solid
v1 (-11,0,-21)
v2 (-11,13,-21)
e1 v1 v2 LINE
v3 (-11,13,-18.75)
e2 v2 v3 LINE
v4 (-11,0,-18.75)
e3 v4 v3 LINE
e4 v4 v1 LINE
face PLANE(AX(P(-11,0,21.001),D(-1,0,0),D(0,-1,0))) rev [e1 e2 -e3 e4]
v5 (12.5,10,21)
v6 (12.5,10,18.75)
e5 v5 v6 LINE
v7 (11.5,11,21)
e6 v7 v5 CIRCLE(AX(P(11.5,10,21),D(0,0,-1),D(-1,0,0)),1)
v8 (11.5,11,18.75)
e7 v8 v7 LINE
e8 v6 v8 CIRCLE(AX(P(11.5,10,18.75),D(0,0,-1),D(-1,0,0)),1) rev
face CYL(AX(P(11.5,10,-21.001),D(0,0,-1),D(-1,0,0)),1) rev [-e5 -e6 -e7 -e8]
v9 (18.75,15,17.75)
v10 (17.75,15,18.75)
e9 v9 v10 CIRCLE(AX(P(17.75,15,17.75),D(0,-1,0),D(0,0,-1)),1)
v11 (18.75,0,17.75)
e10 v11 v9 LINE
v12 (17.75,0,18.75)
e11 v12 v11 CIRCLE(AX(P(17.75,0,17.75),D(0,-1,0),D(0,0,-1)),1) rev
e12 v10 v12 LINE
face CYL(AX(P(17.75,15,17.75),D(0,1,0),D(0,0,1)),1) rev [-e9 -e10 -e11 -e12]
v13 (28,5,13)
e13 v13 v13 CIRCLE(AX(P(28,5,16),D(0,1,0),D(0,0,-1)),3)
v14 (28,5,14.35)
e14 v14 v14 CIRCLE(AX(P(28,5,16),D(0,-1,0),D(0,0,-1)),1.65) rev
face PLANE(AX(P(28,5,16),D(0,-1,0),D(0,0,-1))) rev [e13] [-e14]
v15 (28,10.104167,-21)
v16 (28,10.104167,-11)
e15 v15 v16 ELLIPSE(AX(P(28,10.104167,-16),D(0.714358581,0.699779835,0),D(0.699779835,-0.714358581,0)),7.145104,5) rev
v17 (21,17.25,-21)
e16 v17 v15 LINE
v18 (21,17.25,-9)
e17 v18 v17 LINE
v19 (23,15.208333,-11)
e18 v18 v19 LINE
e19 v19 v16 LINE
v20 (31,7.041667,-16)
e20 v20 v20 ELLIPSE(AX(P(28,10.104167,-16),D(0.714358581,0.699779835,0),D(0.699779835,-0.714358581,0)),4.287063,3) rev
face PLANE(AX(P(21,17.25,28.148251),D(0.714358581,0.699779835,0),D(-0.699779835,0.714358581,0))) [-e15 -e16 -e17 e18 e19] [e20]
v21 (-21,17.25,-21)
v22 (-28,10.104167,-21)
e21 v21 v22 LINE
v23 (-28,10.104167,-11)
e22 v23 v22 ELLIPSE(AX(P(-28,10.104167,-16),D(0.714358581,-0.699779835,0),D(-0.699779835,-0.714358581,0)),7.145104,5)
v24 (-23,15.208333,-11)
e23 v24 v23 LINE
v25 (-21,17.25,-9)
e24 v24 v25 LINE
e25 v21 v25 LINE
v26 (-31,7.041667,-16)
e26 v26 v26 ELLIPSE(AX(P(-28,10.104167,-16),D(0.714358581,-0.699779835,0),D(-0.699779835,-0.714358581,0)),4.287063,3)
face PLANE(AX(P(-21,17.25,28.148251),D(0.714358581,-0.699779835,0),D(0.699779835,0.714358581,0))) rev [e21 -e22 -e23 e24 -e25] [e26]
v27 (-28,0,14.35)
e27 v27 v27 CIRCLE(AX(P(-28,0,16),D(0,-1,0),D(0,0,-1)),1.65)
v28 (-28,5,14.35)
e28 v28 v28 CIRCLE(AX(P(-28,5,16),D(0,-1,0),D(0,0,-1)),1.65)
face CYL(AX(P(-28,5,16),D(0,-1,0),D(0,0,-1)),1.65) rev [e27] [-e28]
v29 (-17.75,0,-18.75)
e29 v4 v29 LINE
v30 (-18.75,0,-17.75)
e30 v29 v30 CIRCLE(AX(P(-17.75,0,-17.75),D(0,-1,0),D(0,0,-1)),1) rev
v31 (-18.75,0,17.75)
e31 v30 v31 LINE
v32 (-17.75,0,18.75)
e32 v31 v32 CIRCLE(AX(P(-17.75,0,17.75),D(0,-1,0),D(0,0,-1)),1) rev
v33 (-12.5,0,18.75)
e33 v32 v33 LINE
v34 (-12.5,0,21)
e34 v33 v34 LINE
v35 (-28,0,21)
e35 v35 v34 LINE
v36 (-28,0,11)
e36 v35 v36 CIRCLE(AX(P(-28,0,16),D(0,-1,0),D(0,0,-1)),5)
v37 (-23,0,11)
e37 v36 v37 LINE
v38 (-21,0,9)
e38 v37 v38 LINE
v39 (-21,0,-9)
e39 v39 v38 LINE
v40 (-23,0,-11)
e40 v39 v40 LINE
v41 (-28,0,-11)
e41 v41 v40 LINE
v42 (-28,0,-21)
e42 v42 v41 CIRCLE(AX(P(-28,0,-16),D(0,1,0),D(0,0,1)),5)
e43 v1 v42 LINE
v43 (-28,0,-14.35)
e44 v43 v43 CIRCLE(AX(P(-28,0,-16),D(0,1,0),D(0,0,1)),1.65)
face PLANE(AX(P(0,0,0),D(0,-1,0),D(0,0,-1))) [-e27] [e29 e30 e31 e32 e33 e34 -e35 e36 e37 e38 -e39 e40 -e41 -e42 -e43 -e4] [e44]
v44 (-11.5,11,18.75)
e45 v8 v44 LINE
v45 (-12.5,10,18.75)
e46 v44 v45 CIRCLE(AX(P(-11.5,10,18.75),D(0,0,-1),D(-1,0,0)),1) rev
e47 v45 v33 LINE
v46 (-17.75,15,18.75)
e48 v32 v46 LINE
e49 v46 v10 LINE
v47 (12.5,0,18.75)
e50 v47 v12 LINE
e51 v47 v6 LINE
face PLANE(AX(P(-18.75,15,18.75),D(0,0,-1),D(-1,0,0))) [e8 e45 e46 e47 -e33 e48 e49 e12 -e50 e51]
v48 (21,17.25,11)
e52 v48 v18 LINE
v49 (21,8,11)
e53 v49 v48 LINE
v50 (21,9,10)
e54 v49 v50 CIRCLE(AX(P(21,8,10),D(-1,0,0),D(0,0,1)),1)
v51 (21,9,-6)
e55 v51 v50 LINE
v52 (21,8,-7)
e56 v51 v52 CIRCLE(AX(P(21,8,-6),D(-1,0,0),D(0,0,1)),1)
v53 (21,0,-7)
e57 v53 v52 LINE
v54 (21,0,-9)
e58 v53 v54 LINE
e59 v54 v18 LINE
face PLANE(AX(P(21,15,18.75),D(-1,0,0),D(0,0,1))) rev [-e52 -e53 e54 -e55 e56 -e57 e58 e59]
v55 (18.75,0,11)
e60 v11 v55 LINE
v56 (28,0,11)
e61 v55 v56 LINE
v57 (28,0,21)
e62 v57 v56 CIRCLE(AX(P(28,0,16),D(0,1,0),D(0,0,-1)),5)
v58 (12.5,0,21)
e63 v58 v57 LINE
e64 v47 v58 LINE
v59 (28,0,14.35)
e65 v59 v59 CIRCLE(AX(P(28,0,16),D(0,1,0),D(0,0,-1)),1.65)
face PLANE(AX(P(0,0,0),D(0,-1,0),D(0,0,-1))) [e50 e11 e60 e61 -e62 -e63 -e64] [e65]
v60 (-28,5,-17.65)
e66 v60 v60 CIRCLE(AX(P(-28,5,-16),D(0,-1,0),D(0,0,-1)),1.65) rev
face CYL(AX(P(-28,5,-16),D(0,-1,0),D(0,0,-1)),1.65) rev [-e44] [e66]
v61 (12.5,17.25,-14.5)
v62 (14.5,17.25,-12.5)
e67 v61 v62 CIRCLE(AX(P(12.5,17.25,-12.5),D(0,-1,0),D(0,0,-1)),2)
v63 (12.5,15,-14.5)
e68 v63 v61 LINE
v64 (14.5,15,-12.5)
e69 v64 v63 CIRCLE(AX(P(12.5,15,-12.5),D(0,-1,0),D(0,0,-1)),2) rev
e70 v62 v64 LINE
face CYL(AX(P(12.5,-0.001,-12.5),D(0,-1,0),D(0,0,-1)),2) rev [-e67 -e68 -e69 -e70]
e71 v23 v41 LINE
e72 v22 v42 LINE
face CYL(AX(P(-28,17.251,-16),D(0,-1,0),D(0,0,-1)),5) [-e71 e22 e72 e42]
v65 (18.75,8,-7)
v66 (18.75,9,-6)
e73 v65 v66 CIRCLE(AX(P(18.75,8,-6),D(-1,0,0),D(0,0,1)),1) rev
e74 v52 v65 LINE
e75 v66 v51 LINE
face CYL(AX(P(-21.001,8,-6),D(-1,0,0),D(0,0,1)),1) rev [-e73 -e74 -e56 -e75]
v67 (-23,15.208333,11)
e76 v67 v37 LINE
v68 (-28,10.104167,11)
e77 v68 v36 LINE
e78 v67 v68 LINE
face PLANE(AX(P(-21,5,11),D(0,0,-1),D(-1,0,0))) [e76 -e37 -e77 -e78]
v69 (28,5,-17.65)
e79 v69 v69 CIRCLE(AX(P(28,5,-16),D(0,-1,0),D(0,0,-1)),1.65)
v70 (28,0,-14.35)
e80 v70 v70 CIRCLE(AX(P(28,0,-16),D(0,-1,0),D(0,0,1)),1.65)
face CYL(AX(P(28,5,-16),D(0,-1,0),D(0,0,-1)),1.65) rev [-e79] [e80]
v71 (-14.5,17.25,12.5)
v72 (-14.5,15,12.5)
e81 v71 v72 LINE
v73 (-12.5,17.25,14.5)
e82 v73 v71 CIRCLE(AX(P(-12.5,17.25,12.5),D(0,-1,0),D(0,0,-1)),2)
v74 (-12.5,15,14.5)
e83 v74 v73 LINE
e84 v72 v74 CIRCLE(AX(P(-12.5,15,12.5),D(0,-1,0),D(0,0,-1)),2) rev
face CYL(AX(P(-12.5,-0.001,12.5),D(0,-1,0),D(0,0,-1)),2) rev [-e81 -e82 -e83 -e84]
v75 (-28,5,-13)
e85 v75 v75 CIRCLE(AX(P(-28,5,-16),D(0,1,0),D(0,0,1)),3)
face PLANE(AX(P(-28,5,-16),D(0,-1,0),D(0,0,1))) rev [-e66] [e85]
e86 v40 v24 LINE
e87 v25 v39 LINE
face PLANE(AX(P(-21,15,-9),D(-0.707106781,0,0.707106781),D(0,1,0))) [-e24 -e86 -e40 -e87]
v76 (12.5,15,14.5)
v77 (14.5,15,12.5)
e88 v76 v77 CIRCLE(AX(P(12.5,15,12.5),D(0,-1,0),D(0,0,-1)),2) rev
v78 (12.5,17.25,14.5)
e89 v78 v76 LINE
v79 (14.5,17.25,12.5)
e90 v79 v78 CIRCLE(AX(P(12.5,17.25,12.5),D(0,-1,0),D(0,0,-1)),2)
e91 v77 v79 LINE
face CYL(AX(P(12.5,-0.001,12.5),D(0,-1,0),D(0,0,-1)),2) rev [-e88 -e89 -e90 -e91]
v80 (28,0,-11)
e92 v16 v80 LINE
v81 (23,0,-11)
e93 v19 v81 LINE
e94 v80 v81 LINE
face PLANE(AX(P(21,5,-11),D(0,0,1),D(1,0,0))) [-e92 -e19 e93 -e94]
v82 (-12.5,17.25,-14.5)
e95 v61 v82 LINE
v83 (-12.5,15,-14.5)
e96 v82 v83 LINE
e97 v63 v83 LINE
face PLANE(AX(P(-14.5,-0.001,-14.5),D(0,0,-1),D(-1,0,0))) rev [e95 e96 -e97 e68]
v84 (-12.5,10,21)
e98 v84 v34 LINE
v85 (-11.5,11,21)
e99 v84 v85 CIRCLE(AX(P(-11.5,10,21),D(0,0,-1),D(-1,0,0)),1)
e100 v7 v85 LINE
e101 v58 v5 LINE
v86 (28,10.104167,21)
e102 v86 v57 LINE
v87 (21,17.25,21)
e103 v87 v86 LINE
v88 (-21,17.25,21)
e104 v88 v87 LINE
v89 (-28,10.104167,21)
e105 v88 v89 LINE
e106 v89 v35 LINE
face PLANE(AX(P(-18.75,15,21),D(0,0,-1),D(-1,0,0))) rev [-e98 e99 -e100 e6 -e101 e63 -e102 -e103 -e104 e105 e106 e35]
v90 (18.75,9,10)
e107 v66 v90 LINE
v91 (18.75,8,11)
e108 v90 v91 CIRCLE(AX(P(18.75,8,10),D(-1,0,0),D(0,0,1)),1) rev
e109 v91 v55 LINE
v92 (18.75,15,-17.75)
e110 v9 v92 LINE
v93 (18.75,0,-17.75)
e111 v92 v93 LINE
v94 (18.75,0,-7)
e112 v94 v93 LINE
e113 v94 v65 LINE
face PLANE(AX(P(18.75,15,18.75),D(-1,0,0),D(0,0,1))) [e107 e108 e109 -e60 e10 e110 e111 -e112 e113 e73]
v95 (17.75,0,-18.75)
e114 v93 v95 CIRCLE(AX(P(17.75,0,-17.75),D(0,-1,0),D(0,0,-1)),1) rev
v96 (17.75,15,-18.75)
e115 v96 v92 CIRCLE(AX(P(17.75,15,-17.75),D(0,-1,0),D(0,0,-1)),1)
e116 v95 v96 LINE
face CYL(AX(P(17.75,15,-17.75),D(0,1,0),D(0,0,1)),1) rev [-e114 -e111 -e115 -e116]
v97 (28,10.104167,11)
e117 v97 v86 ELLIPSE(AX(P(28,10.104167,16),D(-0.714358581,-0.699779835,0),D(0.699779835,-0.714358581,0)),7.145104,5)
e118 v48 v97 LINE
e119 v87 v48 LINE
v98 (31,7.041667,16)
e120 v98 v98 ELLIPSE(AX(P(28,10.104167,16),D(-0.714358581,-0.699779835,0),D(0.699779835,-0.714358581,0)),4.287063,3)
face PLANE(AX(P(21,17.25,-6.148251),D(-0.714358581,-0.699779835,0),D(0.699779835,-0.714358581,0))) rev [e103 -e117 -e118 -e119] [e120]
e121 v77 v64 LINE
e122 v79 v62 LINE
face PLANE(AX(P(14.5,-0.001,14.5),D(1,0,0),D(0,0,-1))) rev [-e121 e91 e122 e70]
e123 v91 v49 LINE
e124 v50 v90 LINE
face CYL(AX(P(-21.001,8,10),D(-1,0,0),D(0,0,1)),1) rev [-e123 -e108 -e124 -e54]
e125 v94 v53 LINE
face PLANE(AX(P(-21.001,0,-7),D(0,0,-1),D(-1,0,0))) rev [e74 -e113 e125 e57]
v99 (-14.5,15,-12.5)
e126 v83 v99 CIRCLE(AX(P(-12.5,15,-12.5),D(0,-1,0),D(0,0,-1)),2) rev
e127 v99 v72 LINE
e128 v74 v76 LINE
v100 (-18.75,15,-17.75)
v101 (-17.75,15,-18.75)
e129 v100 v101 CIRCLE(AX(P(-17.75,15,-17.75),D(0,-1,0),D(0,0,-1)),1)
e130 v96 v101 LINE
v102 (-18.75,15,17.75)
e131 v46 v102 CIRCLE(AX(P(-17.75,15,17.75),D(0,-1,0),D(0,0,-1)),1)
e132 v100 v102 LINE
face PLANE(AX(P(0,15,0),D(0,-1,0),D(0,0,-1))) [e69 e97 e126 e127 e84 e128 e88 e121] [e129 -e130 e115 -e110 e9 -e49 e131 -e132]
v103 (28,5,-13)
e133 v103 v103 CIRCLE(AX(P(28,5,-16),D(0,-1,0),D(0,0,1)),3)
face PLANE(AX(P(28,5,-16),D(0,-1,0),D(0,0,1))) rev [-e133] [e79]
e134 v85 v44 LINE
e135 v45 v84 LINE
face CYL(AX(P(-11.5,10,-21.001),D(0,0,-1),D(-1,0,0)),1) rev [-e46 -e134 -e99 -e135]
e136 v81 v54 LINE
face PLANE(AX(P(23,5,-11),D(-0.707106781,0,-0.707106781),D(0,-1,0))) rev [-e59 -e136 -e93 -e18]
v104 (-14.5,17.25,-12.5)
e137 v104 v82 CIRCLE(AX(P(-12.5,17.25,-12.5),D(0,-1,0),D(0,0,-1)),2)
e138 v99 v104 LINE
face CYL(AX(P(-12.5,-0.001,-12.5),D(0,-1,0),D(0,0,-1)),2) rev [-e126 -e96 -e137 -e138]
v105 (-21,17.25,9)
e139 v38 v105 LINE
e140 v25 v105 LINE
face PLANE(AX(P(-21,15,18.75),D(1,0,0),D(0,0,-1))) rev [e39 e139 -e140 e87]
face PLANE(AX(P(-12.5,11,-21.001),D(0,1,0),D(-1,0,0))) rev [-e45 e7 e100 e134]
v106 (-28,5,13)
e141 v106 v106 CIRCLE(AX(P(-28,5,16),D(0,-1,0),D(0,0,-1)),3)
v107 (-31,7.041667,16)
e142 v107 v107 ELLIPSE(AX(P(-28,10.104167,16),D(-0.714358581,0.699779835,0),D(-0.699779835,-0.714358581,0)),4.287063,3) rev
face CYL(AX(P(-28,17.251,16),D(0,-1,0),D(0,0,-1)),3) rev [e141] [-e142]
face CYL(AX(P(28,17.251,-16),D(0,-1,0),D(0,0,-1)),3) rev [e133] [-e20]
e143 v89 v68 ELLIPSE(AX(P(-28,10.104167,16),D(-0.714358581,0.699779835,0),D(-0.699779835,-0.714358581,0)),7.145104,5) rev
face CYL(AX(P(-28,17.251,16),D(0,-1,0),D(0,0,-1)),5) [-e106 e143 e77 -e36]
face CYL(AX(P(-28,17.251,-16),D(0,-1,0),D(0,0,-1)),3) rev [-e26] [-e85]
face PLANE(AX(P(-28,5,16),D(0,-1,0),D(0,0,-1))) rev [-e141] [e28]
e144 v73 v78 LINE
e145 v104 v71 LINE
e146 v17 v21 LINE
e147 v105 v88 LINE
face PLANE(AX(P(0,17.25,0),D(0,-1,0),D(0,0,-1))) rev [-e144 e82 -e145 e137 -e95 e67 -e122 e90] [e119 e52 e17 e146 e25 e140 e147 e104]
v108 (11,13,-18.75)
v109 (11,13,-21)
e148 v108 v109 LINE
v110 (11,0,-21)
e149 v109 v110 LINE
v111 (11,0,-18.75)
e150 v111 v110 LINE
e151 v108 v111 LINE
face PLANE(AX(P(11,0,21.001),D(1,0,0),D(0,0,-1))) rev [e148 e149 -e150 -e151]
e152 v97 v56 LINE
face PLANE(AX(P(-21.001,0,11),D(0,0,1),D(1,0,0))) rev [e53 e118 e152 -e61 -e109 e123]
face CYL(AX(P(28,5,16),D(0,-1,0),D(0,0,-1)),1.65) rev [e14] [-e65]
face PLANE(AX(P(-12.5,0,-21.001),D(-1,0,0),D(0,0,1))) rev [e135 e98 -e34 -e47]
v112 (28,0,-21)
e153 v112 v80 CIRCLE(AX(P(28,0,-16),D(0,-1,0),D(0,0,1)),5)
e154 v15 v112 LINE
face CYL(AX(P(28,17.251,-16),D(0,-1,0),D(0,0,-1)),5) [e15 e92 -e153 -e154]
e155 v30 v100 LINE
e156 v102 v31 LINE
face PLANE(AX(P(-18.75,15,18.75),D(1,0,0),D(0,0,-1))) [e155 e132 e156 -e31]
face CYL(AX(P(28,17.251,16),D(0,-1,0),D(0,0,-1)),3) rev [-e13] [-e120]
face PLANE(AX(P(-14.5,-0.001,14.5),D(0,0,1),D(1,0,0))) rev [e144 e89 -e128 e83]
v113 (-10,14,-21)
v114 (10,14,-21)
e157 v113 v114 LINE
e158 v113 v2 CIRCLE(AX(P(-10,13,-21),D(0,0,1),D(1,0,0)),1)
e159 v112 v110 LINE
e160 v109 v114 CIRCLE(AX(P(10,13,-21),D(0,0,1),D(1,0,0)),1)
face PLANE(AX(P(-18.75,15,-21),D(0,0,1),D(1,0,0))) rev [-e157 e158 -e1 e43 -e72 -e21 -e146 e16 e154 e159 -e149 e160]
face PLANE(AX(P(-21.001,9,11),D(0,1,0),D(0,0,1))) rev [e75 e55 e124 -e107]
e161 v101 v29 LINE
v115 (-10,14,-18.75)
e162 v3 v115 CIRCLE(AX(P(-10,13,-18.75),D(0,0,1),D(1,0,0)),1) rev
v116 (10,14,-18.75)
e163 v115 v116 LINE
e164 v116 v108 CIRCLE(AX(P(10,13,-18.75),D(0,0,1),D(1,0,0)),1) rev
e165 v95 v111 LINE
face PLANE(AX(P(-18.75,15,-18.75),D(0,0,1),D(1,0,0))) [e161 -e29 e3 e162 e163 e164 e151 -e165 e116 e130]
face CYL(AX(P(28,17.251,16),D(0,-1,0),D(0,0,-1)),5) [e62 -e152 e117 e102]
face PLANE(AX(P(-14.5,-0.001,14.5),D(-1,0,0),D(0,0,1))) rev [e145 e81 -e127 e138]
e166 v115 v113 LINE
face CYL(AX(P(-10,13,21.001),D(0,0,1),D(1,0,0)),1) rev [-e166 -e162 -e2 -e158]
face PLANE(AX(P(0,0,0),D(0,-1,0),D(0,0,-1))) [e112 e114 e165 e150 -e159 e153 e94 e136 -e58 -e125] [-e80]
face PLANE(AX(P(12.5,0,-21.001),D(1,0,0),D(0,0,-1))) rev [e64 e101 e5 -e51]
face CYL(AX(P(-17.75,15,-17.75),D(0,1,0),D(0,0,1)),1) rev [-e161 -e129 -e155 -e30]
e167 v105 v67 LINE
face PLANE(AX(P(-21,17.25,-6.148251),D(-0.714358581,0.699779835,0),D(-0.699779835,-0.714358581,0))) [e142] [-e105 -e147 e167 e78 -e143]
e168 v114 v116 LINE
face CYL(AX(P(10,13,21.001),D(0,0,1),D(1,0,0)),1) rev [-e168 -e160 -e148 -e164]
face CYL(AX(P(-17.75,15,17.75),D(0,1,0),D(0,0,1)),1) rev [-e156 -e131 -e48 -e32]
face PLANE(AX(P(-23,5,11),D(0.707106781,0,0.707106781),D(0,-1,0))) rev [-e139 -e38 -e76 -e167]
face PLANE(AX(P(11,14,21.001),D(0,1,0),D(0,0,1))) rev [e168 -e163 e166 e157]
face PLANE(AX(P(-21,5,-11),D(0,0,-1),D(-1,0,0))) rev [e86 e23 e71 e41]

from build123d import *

# Parameters (mm, degrees)
SKETCH1_W           = 37.5
SKETCH1_H           = 37.5
BOSS_EXTRUDE1_DEPTH = 15
SHELL1_T            = 2.25
CUT_EXTRUDE1_REACH  = 52.026
SKETCH2_W           = 25
SKETCH2_H           = 11
CUT_EXTRUDE2_REACH  = 52.026
SKETCH3_W           = 18
SKETCH3_H           = 9
CUT_EXTRUDE3_REACH  = 36.345
SKETCH5_W           = 29
SKETCH5_H           = 29
FILLET1_R           = 2
CUT_EXTRUDE4_REACH  = 52.026
SKETCH6_W           = 22
SKETCH6_H           = 14
FILLET2_R           = 1
SKETCH9_W           = 12
SKETCH9_H           = 10
BOSS_EXTRUDE3_DEPTH = 5
BOSS_EXTRUDE4_DEPTH = 10
SKETCH11_R          = 1.65
CUT_EXTRUDE5_DEPTH  = 5
CUT_EXTRUDE6_REACH  = 42.989
SKETCH12_R          = 3
CUT_EXTRUDE7_REACH  = 44.75
MIRROR3_OUTLINE_R   = 1.65
MIRROR3_DEPTH       = 5
MIRROR3_START       = 5
MIRROR3_2_OUTLINE_R = 3
MIRROR3_2_DEPTH     = 12.25
MIRROR3_START_2     = 27.072732359
MIRROR3_3_OUTLINE_W = 20
MIRROR3_3_OUTLINE_H = 11
MIRROR3_3_DEPTH     = 9.927267641
CHAMFER1_SIZE       = 2
FILLET3_R           = 1


with BuildPart() as part:
    # Sketch1 → Boss-Extrude1 (new body)
    with BuildSketch(Plane(origin=(0, 0, 0), x_dir=(1, 0, 0), z_dir=(0, 1, 0))):
        Rectangle(SKETCH1_W, SKETCH1_H)
    extrude(amount=BOSS_EXTRUDE1_DEPTH)

    # Shell1
    shell1_openings = [part.faces().sort_by_distance(p)[0] for p in [
        (0, 0, 0),
    ]]
    offset(amount=SHELL1_T, openings=shell1_openings, kind=Kind.INTERSECTION)

    # Sketch2 → Cut-Extrude1 (cut, up to next)
    with BuildSketch(Plane.XY.offset(21), mode=Mode.PRIVATE) as cut_extrude1_sk1:
        with Locations((0, 5.5)):
            Rectangle(SKETCH2_W, SKETCH2_H)
    cut_extrude1_tool1 = extrude(cut_extrude1_sk1.sketch, amount=-CUT_EXTRUDE1_REACH, mode=Mode.PRIVATE) & part.part
    add(cut_extrude1_tool1.solids().sort_by_distance((0, 5.5, 21))[0], mode=Mode.SUBTRACT)

    # Sketch3 → Cut-Extrude2 (cut, up to next)
    with BuildSketch(Plane(origin=(21, 0, 0), x_dir=(0, 0, -1), z_dir=(1, 0, 0)), mode=Mode.PRIVATE) as cut_extrude2_sk1:
        with Locations((-2, 4.5)):
            Rectangle(SKETCH3_W, SKETCH3_H)
    cut_extrude2_tool1 = extrude(cut_extrude2_sk1.sketch, amount=-CUT_EXTRUDE2_REACH, mode=Mode.PRIVATE) & part.part
    add(cut_extrude2_tool1.solids().sort_by_distance((21, 4.5, 2))[0], mode=Mode.SUBTRACT)

    # Sketch5 → Cut-Extrude3 (cut, up to next)
    with BuildSketch(Plane(origin=(0, 17.25, 0), x_dir=(1, 0, 0), z_dir=(0, 1, 0)), mode=Mode.PRIVATE) as cut_extrude3_sk1:
        Rectangle(SKETCH5_W, SKETCH5_H)
    cut_extrude3_tool1 = extrude(cut_extrude3_sk1.sketch, amount=-CUT_EXTRUDE3_REACH, mode=Mode.PRIVATE) & part.part
    add(cut_extrude3_tool1.solids().sort_by_distance((0, 17.25, 0))[0], mode=Mode.SUBTRACT)

    # Fillet1
    fillet1_edges = [part.edges().sort_by_distance(p)[0] for p in [
        (14.5, 16.125, -14.5),
        (14.5, 16.125, 14.5),
        (-14.5, 16.125, 14.5),
        (-14.5, 16.125, -14.5),
    ]]
    fillet(fillet1_edges, radius=FILLET1_R)

    # Sketch6 → Cut-Extrude4 (cut, up to next)
    with BuildSketch(Plane(origin=(0, 0, -21), x_dir=(-1, 0, 0), z_dir=(0, 0, -1)), mode=Mode.PRIVATE) as cut_extrude4_sk1:
        with Locations((0, 7)):
            Rectangle(SKETCH6_W, SKETCH6_H)
    cut_extrude4_tool1 = extrude(cut_extrude4_sk1.sketch, amount=-CUT_EXTRUDE4_REACH, mode=Mode.PRIVATE) & part.part
    add(cut_extrude4_tool1.solids().sort_by_distance((0, 7, -21))[0], mode=Mode.SUBTRACT)

    # Fillet2
    fillet2_edges = [part.edges().sort_by_distance(p)[0] for p in [
        (-11, 14, -19.875),
        (11, 14, -19.875),
        (12.5, 11, 19.875),
        (-12.5, 11, 19.875),
        (19.875, 9, 11),
        (19.875, 9, -7),
    ]]
    fillet(fillet2_edges, radius=FILLET2_R)

    # Sketch9 → Boss-Extrude3 (add)
    with BuildSketch(Plane.XZ):
        with Locations((-27, 16)):
            Rectangle(SKETCH9_W, SKETCH9_H)
    boss_extrude3 = extrude(amount=-BOSS_EXTRUDE3_DEPTH)

    # Sketch10 → Boss-Extrude4 (add)
    with BuildSketch(Plane.XY.offset(21)):
        Polygon((-21, 17.25), (-33, 5), (-21, 5), align=None)
    boss_extrude4 = extrude(amount=-BOSS_EXTRUDE4_DEPTH)

    # Sketch11 → Cut-Extrude5 (cut)
    with BuildSketch(Plane.XZ):
        with Locations(Location((-28, 16, 0), (0, 0, 270))):
            Circle(SKETCH11_R)
    cut_extrude5 = extrude(amount=-CUT_EXTRUDE5_DEPTH, mode=Mode.SUBTRACT)

    # Cut-Extrude6: up to this plane
    cut_extrude6_end = Plane(origin=(-21, 17.25, -6.14825064), z_dir=(-0.7143585813751187, 0.6997798348164429, 0))
    # Sketch12 → Cut-Extrude6 (cut, up to the surface)
    with BuildSketch(Plane.XZ.offset(-5), mode=Mode.PRIVATE) as cut_extrude6_sk1:
        with Locations(Location((-28, 16, 0), (0, 0, 270))):
            Circle(SKETCH12_R)
    cut_extrude6_tool1 = split(extrude(cut_extrude6_sk1.sketch, amount=-CUT_EXTRUDE6_REACH, mode=Mode.PRIVATE), bisect_by=cut_extrude6_end, keep=Keep.BOTH, mode=Mode.PRIVATE)
    cut_extrude6 = cut_extrude6_tool1.solids().sort_by_distance((-28, 5, 16))[0]
    add(cut_extrude6, mode=Mode.SUBTRACT)

    # Cut-Extrude7: up to this plane
    cut_extrude7_end = Plane(origin=(-21, 17.25, -6.14825064), z_dir=(-0.7143585813751187, 0.6997798348164429, 0))
    # Sketch13 → Cut-Extrude7 (cut, up to the surface)
    with BuildSketch(Plane.XZ, mode=Mode.PRIVATE) as cut_extrude7_sk1:
        with BuildLine():
            ThreePointArc((-33, 16), (-31.535533906, 19.535533906), (-28, 21))
            Line((-28, 21), (-33, 21))
            Line((-33, 21), (-33, 16))
        make_face()
    cut_extrude7_tool1 = split(extrude(cut_extrude7_sk1.sketch, amount=-CUT_EXTRUDE7_REACH, mode=Mode.PRIVATE), bisect_by=cut_extrude7_end, keep=Keep.BOTH, mode=Mode.PRIVATE)
    # Sketch13 → Cut-Extrude7 (cut, up to the surface)
    with BuildSketch(Plane.XZ, mode=Mode.PRIVATE) as cut_extrude7_sk2:
        with BuildLine():
            Line((-33, 11), (-28, 11))
            ThreePointArc((-28, 11), (-31.535533906, 12.464466094), (-33, 16))
            Line((-33, 16), (-33, 11))
        make_face()
    cut_extrude7_tool2 = split(extrude(cut_extrude7_sk2.sketch, amount=-CUT_EXTRUDE7_REACH, mode=Mode.PRIVATE), bisect_by=cut_extrude7_end, keep=Keep.BOTH, mode=Mode.PRIVATE)
    cut_extrude7 = cut_extrude7_tool1.solids().sort_by_distance((-31.88316, 0, 19.88316))[0] + cut_extrude7_tool2.solids().sort_by_distance((-31.88316, 0, 12.11684))[0]
    add(cut_extrude7, mode=Mode.SUBTRACT)

    # Mirror1: Boss-Extrude3, Boss-Extrude4, Cut-Extrude5, Cut-Extrude6, Cut-Extrude7 across plane
    add(boss_extrude3.mirror(Plane.XY))
    add(boss_extrude4.mirror(Plane.XY))
    add(cut_extrude5.mirror(Plane.XY), mode=Mode.SUBTRACT)
    add(cut_extrude6.mirror(Plane.XY), mode=Mode.SUBTRACT)
    add(cut_extrude7.mirror(Plane.XY), mode=Mode.SUBTRACT)

    # Mirror3: read off the stored shape, not the designer's step
    # Mirror3 outline → Mirror3 (add)
    # profile 1 of 2: a face of its own
    with BuildSketch(Plane(origin=(0, 0, 0), x_dir=(1, 0, 0), z_dir=(0, 1, 0))):
        with BuildLine():
            Line((21, 21), (21, 11))
            Line((21, 11), (28, 11))
            ThreePointArc((28, 11), (33, 16), (28, 21))
            Line((28, 21), (21, 21))
        make_face()
        with Locations((28, 16)):
            Circle(MIRROR3_OUTLINE_R, mode=Mode.SUBTRACT)
    # profile 2 of 2: a face of its own
    with BuildSketch(Plane(origin=(0, 0, 0), x_dir=(1, 0, 0), z_dir=(0, 1, 0))):
        with BuildLine():
            Line((28, -11), (21, -11))
            Line((21, -11), (21, -21))
            Line((21, -21), (28, -21))
            ThreePointArc((28, -21), (33, -16), (28, -11))
        make_face()
        with Locations((28, -16)):
            Circle(MIRROR3_OUTLINE_R, mode=Mode.SUBTRACT)
    extrude(amount=MIRROR3_DEPTH)

    # Mirror3 2 outline → Mirror3 2 (add)
    # profile 1 of 2: a face of its own
    with BuildSketch(Plane(origin=(0, 0, 0), x_dir=(1, 0, 0), z_dir=(0, 1, 0)).offset(MIRROR3_START)):
        with BuildLine():
            Line((21, 21), (21, 11))
            Line((21, 11), (28, 11))
            ThreePointArc((28, 11), (33, 16), (28, 21))
            Line((28, 21), (21, 21))
        make_face()
        with Locations((28, 16)):
            Circle(MIRROR3_2_OUTLINE_R, mode=Mode.SUBTRACT)
    # profile 2 of 2: a face of its own
    with BuildSketch(Plane(origin=(0, 0, 0), x_dir=(1, 0, 0), z_dir=(0, 1, 0)).offset(MIRROR3_START)):
        with BuildLine():
            Line((28, -11), (21, -11))
            Line((21, -11), (21, -21))
            Line((21, -21), (28, -21))
            ThreePointArc((28, -21), (33, -16), (28, -11))
        make_face()
        with Locations((28, -16)):
            Circle(MIRROR3_2_OUTLINE_R, mode=Mode.SUBTRACT)
    extrude(amount=MIRROR3_2_DEPTH)

    # Mirror3 3 outline → Mirror3 3 (cut)
    with BuildSketch(Plane(origin=(0, 0, 0), x_dir=(0.6997798348164427, -0.7143585813751188, 0), z_dir=(0.7143585813751188, 0.6997798348164428, 0)).offset(MIRROR3_START_2)):
        with Locations((11, 16.5)):
            Rectangle(MIRROR3_3_OUTLINE_W, MIRROR3_3_OUTLINE_H)
        with Locations((11, -16.5)):
            Rectangle(MIRROR3_3_OUTLINE_W, MIRROR3_3_OUTLINE_H)
    extrude(amount=MIRROR3_3_DEPTH, mode=Mode.SUBTRACT)

    # Chamfer1
    chamfer1_edges = [part.edges().sort_by_distance(p)[0] for p in [
        (-21, 8.625, 11),
        (-21, 8.625, -11),
        (21, 8.625, -11),
    ]]
    chamfer(chamfer1_edges, length=CHAMFER1_SIZE)

    # Fillet3
    fillet3_edges = [part.edges().sort_by_distance(p)[0] for p in [
        (18.75, 7.5, 18.75),
        (18.75, 7.5, -18.75),
        (-18.75, 7.5, -18.75),
        (-18.75, 7.5, 18.75),
    ]]
    fillet(fillet3_edges, radius=FILLET3_R)


solid = part.part
